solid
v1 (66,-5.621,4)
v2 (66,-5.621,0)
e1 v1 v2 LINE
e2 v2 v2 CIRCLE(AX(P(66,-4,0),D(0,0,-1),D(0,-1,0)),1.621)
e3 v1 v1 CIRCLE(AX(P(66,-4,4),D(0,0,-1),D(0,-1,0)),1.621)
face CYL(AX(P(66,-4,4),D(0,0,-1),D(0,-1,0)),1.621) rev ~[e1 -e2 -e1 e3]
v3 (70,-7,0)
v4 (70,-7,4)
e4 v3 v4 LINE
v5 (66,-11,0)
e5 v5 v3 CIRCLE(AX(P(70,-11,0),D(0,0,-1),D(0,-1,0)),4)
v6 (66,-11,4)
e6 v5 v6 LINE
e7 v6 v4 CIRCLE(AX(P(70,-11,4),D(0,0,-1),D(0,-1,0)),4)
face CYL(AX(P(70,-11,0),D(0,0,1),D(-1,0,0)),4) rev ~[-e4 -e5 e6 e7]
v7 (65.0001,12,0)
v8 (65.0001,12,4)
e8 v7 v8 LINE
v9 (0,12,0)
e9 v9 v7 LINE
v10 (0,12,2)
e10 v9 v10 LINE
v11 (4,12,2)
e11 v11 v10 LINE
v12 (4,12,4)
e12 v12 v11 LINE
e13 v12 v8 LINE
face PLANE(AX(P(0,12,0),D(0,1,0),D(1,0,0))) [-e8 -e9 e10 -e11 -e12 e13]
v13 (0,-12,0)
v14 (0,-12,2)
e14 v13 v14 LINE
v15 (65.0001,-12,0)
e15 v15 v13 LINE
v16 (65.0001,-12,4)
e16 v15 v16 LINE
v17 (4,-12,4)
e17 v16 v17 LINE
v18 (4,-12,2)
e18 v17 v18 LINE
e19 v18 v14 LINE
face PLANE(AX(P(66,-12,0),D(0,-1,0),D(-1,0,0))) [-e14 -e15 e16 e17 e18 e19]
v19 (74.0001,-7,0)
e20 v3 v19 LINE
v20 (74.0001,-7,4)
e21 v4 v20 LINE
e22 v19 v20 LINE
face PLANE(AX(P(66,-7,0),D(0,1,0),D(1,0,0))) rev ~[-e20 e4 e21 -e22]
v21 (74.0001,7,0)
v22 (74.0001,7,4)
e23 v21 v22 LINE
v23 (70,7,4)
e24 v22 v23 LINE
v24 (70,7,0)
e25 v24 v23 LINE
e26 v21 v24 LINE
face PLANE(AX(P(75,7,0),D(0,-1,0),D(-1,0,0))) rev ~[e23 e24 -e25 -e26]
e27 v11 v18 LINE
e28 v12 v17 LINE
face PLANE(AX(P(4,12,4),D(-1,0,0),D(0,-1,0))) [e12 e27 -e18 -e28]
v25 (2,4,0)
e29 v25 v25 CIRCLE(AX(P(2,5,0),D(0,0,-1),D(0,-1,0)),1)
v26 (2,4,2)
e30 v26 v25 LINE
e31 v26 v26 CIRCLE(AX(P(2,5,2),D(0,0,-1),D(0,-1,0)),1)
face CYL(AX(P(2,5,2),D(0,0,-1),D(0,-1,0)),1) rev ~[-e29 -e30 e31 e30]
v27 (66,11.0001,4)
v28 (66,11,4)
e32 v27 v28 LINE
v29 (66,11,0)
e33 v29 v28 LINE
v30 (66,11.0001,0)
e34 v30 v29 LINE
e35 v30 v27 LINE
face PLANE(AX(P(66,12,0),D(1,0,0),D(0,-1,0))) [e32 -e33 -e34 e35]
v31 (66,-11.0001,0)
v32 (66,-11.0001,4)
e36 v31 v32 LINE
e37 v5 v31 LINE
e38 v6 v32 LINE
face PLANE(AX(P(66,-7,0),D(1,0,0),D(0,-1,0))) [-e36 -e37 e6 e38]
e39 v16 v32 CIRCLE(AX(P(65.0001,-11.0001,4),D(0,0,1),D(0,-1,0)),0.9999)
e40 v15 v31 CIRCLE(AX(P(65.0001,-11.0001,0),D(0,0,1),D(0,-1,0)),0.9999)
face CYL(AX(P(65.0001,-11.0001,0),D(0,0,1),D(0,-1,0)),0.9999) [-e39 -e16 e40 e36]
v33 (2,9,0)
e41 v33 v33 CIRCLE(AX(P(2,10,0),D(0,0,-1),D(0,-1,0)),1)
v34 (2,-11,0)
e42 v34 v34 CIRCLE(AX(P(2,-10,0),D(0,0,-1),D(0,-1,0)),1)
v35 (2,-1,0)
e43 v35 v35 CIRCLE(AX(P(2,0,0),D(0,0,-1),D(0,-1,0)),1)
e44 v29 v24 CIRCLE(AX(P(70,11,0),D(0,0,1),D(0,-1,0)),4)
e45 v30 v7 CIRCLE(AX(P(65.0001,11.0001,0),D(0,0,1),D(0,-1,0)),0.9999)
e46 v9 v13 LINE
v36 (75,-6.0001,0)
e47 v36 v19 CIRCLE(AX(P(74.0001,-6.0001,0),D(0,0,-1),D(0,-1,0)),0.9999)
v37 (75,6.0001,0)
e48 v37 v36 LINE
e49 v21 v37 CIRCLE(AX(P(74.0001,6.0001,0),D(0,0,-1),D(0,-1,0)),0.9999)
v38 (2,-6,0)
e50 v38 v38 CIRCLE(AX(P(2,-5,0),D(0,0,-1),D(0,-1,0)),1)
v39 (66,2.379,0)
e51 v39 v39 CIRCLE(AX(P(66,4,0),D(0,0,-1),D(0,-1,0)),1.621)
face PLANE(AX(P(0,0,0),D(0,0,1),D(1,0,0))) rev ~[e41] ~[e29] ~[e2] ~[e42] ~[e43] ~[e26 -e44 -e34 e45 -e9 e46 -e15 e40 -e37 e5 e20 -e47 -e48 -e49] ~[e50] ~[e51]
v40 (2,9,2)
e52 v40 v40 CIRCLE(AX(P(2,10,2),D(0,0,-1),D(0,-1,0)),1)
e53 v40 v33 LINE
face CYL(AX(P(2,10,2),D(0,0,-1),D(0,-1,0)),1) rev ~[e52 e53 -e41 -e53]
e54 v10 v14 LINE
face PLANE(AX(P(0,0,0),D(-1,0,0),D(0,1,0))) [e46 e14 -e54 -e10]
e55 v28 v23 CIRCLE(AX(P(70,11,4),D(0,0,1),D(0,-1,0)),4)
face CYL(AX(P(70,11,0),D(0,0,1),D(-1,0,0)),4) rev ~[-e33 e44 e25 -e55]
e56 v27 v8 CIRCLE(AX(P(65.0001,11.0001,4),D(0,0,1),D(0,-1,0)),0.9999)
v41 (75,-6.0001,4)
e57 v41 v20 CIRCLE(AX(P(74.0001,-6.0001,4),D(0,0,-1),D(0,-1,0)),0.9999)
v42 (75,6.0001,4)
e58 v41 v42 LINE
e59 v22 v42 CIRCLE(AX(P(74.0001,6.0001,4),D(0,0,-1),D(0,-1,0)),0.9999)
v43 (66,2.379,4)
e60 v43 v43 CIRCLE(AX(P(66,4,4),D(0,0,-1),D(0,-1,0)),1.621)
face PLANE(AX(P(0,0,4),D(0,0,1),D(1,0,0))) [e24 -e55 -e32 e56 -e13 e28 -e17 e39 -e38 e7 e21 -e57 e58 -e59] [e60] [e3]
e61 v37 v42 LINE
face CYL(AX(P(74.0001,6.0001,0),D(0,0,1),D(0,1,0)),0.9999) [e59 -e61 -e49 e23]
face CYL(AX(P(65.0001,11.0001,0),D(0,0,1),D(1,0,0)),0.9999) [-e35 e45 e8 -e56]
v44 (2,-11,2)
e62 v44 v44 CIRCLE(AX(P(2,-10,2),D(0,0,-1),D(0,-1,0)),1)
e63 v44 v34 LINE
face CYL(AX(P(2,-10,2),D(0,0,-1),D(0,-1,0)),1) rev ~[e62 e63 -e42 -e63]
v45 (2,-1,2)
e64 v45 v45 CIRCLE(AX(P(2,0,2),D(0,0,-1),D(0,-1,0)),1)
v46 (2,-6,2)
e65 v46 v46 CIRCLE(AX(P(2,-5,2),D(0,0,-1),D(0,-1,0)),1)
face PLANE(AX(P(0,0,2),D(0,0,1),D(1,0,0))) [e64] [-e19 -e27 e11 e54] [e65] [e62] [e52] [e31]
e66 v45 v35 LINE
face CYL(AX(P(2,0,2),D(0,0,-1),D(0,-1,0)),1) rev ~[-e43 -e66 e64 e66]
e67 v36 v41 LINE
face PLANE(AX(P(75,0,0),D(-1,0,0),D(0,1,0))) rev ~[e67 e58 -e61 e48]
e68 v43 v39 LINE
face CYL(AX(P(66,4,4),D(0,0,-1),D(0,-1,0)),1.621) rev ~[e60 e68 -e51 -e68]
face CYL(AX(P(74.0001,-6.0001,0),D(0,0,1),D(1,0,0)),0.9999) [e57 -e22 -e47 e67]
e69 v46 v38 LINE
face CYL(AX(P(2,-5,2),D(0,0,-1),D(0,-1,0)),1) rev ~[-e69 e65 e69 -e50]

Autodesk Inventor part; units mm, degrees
ref_plane "YZ Plane" through (0, 0, 0) normal (1, 0, 0) x (0, 1, 0)
ref_plane "XZ Plane" through (0, 0, 0) normal (0, 1, 0) x (-1, 0, 0)
ref_plane "XY Plane" through (0, 0, 0) normal (0, 0, 1) x (1, 0, 0)
sketch "Skizze1" plane through (0, 0, 0) normal (0, 0, 1) x (1, 0, 0)
  line L0 (0, 12) -> (66, 12)
  line L1 (66, -12) -> (0, -12)
  line L2 (0, -12) -> (0, 12)
  line L3 (-15, 0) -> (90, 0) projected
  line L4 (66, -7) -> (75, -7)
  line L5 (75, -7) -> (75, 7)
  line L6 (75, 7) -> (66, 7)
  line L7 (66, 12) -> (66, 7)
  line L8 (66, -7) -> (66, -12)
  point P0 (0, 0)
  dimension "d0" = 24
  dimension "d1" = 66
  dimension "d29" = 14
  dimension "d30" = 9
extrude "Extrusion1" add sketch "Skizze1" along normal blind 4
sketch "Skizze2" plane through (0, 0, 4) normal (0, 0, 1) x (1, 0, 0)
  line L0 (66, 12) -> (0, 12) projected
  line L1 (0, 12) -> (0, -12) projected
  line L2 (0, 12) -> (4, 12)
  line L3 (4, 12) -> (4, -12)
  line L4 (4, -12) -> (0, -12)
  line L5 (0, -12) -> (0, 12)
  point P0 (0, 0)
  dimension "d4" = 4
extrude "Extrusion2" cut sketch "Skizze2" against normal blind 2
sketch "Skizze3" plane through (0, 0, 2) normal (0, 0, 1) x (1, 0, 0)
  line L0 (0, 16.8) -> (0, -16.8) projected
  line L1 (-15, 0) -> (90, 0) projected
  point P0 (0, 0)
  point P1 (2, 0)
  dimension "d7" = 2
hole "Bohrung1" at (2, 0, 2) direction (0, 0, -1) diameter 2 end through all
pattern_linear "Rechteckige Anordnung1" count 5 spacing 5 along (0, 1, 0) of "Bohrung1" first direction both ways yes
sketch "Skizze4" plane through (0, 0, 4) normal (0, 0, 1) x (1, 0, 0)
  line L0 (-15, 0) -> (90, 0) projected
  line L1 (66, -12) -> (66, 12) projected
  line L2 (75, -7) -> (75, 7) construction
  point P0 (0, 0)
  point P1 (66, 4)
  point P2 (66, -4)
  dimension "d31" = 8
  dimension "d36" = 0
hole "Bohrung2" at (66, -4, 4) at (66, 4, 4) direction (0, 0, -1) diameter 3.242 end through all thread size "M4x0.7" class "6H" standard "ISO Metric profile"
fillet "Rundung1" radius 4 2 edges at (66, -7, 2) (66, 7, 2)
fillet "Rundung2" radius 1 4 edges at (66, -12, 2) (66, 12, 2) (75, -7, 2) (75, 7, 2)
properties part number "Kicker Eisen" material "Stahl, unlegiert"
